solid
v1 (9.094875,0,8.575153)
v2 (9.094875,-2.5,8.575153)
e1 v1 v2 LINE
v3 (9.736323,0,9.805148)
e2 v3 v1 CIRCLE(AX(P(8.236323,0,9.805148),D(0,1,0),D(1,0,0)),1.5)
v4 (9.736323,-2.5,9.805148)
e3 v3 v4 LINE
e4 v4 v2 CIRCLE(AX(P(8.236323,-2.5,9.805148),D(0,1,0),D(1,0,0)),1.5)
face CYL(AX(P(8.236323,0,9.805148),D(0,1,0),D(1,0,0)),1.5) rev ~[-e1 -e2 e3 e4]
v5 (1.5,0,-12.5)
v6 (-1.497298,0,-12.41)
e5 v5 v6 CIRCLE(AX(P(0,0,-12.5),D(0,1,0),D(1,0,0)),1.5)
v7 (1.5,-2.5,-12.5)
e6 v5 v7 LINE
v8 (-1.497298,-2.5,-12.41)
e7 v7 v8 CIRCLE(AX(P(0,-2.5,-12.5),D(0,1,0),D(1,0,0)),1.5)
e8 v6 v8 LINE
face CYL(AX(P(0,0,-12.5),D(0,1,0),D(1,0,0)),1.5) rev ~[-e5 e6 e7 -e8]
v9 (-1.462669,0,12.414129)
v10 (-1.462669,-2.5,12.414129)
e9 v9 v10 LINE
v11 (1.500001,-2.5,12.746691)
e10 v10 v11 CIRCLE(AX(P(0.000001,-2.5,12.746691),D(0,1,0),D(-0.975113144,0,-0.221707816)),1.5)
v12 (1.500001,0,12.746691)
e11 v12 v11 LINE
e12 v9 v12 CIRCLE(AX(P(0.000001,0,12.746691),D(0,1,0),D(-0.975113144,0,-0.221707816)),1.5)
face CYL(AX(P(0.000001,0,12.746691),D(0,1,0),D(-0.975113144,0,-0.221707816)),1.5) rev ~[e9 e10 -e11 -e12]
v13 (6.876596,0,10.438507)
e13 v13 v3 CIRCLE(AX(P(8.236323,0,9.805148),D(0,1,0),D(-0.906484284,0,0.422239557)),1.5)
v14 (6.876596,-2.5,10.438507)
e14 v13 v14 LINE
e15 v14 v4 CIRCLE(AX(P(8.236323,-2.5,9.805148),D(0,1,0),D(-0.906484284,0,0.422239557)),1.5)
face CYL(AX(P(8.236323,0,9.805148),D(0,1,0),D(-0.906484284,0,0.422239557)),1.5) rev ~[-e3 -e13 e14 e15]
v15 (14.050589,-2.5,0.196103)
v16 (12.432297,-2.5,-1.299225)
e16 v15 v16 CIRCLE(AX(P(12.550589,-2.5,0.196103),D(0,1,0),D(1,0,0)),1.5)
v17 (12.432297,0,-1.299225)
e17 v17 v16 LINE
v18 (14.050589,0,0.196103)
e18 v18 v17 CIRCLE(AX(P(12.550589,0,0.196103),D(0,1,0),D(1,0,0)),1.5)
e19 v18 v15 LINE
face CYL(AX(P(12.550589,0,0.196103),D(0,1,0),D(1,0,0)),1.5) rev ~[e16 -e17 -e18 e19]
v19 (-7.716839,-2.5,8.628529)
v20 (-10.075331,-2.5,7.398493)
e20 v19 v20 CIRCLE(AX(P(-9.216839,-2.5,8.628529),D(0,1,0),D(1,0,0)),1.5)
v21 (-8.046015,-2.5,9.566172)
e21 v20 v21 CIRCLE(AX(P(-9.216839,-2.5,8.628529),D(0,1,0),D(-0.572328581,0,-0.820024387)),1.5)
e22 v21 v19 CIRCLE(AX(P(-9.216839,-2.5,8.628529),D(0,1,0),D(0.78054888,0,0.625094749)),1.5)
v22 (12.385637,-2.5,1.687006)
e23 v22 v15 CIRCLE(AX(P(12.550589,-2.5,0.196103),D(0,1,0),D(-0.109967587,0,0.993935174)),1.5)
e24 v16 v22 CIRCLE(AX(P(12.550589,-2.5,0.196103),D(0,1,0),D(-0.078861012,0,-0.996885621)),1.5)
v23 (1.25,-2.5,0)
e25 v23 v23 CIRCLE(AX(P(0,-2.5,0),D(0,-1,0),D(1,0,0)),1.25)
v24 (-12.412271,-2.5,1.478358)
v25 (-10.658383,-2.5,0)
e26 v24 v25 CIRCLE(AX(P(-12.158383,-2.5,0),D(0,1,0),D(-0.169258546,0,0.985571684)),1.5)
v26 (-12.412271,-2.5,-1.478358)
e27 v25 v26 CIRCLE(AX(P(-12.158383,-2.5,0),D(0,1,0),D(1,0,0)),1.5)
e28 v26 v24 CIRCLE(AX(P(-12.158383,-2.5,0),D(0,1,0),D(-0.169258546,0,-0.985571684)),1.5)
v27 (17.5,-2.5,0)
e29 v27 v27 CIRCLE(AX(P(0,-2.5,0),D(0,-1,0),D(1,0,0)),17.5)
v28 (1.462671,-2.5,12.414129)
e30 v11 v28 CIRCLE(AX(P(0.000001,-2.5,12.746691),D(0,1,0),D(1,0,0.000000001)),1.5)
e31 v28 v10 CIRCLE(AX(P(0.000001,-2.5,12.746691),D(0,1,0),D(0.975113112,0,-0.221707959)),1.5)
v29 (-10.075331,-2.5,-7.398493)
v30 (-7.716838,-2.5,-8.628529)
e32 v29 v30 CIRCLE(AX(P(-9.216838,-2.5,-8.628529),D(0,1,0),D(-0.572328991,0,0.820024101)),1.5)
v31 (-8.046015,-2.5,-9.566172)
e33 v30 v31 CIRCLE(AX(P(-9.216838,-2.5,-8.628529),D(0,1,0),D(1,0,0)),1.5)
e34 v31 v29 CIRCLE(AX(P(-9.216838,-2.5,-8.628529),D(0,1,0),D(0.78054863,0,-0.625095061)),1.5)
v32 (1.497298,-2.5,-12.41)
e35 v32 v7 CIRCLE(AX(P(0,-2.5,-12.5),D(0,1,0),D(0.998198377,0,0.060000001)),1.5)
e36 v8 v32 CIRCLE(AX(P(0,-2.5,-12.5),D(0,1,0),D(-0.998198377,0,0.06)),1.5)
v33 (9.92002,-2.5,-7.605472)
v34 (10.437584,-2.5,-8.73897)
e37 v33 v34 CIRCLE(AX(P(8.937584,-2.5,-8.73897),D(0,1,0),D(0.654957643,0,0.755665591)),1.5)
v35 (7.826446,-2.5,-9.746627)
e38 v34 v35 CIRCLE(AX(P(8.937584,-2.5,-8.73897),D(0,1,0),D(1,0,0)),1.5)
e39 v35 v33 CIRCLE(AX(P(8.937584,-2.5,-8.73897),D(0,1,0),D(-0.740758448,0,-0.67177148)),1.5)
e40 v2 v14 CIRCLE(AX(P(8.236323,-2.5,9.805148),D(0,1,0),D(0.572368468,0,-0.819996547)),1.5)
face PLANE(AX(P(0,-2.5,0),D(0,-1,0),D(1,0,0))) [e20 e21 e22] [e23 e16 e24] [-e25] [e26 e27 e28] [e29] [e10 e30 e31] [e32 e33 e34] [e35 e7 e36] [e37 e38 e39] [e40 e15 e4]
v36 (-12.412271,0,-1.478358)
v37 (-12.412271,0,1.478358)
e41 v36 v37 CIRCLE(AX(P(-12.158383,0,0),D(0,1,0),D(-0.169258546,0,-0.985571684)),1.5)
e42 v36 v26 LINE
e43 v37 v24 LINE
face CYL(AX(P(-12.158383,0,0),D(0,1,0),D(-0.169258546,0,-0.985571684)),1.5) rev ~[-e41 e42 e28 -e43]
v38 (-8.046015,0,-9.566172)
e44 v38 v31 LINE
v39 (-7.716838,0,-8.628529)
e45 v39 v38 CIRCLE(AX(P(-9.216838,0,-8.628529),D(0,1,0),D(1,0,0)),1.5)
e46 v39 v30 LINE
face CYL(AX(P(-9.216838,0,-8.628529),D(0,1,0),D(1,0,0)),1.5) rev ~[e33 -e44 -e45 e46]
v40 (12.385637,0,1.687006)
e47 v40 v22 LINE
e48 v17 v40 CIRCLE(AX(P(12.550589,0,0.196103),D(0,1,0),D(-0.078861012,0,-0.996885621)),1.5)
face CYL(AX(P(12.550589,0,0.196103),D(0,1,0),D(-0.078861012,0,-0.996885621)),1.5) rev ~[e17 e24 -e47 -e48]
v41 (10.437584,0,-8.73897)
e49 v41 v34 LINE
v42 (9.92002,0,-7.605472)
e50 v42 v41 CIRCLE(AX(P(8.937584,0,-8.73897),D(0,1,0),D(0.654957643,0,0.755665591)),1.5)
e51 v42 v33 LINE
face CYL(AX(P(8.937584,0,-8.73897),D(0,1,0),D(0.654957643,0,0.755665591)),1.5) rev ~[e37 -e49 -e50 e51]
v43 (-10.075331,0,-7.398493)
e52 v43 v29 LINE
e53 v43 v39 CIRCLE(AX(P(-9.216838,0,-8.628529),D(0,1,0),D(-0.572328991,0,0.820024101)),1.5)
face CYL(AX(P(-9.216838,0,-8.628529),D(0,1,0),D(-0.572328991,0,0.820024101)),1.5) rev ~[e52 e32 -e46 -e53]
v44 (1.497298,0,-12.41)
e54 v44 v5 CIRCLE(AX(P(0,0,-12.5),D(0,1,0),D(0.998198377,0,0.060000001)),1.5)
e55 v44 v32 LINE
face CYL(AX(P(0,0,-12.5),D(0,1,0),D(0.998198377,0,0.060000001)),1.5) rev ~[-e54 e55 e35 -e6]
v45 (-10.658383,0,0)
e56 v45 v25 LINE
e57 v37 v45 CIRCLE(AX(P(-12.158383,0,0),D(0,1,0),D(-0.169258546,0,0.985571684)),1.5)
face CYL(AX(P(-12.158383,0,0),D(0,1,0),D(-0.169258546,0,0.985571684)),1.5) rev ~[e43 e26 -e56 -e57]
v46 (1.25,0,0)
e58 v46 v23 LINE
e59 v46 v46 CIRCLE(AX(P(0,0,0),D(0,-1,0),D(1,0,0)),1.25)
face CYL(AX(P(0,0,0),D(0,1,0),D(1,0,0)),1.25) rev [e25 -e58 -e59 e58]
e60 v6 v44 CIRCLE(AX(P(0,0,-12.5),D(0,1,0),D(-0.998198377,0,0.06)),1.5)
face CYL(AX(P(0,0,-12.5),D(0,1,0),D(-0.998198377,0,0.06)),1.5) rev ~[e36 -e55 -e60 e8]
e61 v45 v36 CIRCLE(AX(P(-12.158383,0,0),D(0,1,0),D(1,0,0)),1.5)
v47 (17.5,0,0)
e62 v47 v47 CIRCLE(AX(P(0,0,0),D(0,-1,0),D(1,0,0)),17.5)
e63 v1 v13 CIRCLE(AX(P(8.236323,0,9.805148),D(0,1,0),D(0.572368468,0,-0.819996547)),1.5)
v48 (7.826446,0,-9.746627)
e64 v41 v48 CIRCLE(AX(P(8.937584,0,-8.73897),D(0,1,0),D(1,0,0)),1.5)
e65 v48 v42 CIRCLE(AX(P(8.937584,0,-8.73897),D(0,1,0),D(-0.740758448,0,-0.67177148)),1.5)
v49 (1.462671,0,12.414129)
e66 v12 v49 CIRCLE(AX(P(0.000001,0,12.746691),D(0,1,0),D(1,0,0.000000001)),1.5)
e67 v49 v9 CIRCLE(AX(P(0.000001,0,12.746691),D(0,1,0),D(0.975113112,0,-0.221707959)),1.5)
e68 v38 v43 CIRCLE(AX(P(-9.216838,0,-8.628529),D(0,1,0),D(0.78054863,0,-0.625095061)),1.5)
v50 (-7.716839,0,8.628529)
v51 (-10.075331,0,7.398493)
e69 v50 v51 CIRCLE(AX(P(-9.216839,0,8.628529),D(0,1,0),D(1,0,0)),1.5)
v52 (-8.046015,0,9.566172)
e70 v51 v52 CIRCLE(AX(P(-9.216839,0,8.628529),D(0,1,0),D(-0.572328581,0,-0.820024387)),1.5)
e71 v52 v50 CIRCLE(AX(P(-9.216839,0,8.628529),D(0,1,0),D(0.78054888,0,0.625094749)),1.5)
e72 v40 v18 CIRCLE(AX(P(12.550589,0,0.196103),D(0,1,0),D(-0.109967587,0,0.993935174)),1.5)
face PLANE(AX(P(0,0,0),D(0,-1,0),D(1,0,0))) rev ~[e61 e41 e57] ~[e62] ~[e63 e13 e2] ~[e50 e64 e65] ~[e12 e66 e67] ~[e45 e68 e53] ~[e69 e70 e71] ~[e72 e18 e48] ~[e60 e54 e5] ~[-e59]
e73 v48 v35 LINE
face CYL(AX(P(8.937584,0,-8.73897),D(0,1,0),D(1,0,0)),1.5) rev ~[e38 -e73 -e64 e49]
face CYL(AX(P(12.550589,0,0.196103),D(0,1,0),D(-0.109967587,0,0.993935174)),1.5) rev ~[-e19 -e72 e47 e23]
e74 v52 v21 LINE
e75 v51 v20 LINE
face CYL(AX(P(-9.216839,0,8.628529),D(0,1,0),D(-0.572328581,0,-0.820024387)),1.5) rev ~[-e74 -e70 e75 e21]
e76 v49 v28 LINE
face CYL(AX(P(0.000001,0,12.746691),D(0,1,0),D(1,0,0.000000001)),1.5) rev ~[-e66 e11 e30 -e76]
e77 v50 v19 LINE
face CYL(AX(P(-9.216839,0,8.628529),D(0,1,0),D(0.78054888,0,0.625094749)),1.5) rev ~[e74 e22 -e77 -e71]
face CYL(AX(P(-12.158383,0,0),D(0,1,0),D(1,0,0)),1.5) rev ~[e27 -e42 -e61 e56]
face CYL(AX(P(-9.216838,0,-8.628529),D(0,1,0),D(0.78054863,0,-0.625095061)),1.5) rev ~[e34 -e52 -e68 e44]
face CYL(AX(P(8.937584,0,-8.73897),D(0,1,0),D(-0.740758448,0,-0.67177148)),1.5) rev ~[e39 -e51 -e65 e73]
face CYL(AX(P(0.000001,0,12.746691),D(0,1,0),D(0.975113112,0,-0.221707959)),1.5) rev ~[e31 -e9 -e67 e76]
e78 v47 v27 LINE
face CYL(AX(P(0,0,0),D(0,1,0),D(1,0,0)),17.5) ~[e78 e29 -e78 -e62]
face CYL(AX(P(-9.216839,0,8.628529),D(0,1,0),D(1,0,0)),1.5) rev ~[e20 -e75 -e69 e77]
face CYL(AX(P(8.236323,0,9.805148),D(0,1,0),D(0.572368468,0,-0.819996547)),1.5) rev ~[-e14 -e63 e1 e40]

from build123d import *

# Parameters (mm, degrees)
F0_R     = 17.5
F0_R_2   = 2.5
F0_R_3   = 1.25
F1_DEPTH = 2.5


# Not quite as in the source:
# - the program builds the solid bodies; features that only make, move or delete a surface that nothing else refers to are left out


with BuildPart() as f1:
    # F0 (on Front) → F1 (new body)
    with BuildSketch(Plane.XZ):
        Circle(F0_R)
        with BuildLine():
            ThreePointArc((1.4972975656, -12.41), (1.4993242392, -12.454979718), (1.5, -12.5))
            ThreePointArc((1.5, -12.5), (-0.045020282, -13.9993242392), (-1.4972975656, -12.41))
            ThreePointArc((-1.4972975656, -12.41), (-4.9790100681, -11.4655771221), (-8.0460146394, -9.5661720883))
            ThreePointArc((-8.0460146394, -9.5661720883), (-10.3118696418, -9.6536659725), (-10.0753310722, -7.3984933456))
            ThreePointArc((-10.0753310722, -7.3984933456), (-11.6269109472, -4.5896559594), (-12.4122705024, -1.4783575263))
            ThreePointArc((-12.4122705024, -1.4783575263), (-13.658382684, 0), (-12.4122705024, 1.4783575263))
            ThreePointArc((-12.4122705024, 1.4783575263), (-11.6269110451, 4.5896557115), (-10.0753313878, 7.3984929159))
            ThreePointArc((-10.0753313878, 7.3984929159), (-10.3118706248, 9.6536659173), (-8.0460151958, 9.5661716203))
            ThreePointArc((-8.0460151958, 9.5661716203), (-4.9630114991, 11.472511358), (-1.4626687852, 12.4141290482))
            ThreePointArc((-1.4626687852, 12.4141290482), (-0.167324239, 14.2373289873), (1.5000009313, 12.7466907725))
            ThreePointArc((1.5000009313, 12.7466907725), (1.4906391339, 12.5793654932), (1.4626705992, 12.4141288344))
            ThreePointArc((1.4626705992, 12.4141288344), (4.2850452641, 11.7425886024), (6.8765961266, 10.4385068718))
            ThreePointArc((6.8765961266, 10.4385068718), (8.5606760335, 11.2696593384), (9.736322552, 9.8051475361))
            ThreePointArc((9.736322552, 9.8051475361), (9.5663280132, 9.1115442827), (9.0948752545, 8.5751527162))
            ThreePointArc((9.0948752545, 8.5751527162), (11.2789515194, 5.388436937), (12.3856373166, 1.6870057091))
            ThreePointArc((12.3856373166, 1.6870057091), (13.5512317227, 1.3135614646), (14.0505886972, 0.1961029484))
            ThreePointArc((14.0505886972, 0.1961029484), (13.5685677546, -0.9055860452), (12.4322971789, -1.2992254827))
            ThreePointArc((12.4322971789, -1.2992254827), (11.6124376907, -4.6261529244), (9.9200203194, -7.6054715083))
            ThreePointArc((9.9200203194, -7.6054715083), (10.3020717987, -8.1159348628), (10.4375838551, -8.7389698954))
            ThreePointArc((10.4375838551, -8.7389698954), (9.4776271369, -10.1383816482), (7.8264461833, -9.7466271161))
            ThreePointArc((7.8264461833, -9.7466271161), (4.8483438568, -11.5214392263), (1.4972975656, -12.41))
        make_face(mode=Mode.SUBTRACT)
        with BuildLine():
            ThreePointArc((-1.4972975656, -12.41), (0, -11), (1.4972975656, -12.41))
            ThreePointArc((1.4972975656, -12.41), (4.8483438568, -11.5214392263), (7.8264461833, -9.7466271161))
            ThreePointArc((7.8264461833, -9.7466271161), (7.8650737925, -7.690293508), (9.9200203194, -7.6054715083))
            ThreePointArc((9.9200203194, -7.6054715083), (11.6124376907, -4.6261529244), (12.4322971789, -1.2992254827))
            ThreePointArc((12.4322971789, -1.2992254827), (11.0507717691, 0.1726683089), (12.3856373166, 1.6870057091))
            ThreePointArc((12.3856373166, 1.6870057091), (11.2789515194, 5.388436937), (9.0948752545, 8.5751527162))
            ThreePointArc((9.0948752545, 8.5751527162), (7.271534517, 8.6565901594), (6.8765961266, 10.4385068718))
            ThreePointArc((6.8765961266, 10.4385068718), (4.2850452641, 11.7425886024), (1.4626705992, 12.4141288344))
            ThreePointArc((1.4626705992, 12.4141288344), (8.217e-07, 11.2466907725), (-1.4626687852, 12.4141290482))
            ThreePointArc((-1.4626687852, 12.4141290482), (-4.9630114991, 11.472511358), (-8.0460151958, 9.5661716203))
            ThreePointArc((-8.0460151958, 9.5661716203), (-7.8015231838, 9.1254022263), (-7.7168385163, 8.6285294965))
            ThreePointArc((-7.7168385163, 8.6285294965), (-8.5232029157, 7.298540905), (-10.0753313878, 7.3984929159))
            ThreePointArc((-10.0753313878, 7.3984929159), (-11.6269110451, 4.5896557115), (-12.4122705024, 1.4783575263))
            ThreePointArc((-12.4122705024, 1.4783575263), (-11.1916437657, 1.146915805), (-10.658382684, 0))
            ThreePointArc((-10.658382684, 0), (-11.1916437657, -1.146915805), (-12.4122705024, -1.4783575263))
            ThreePointArc((-12.4122705024, -1.4783575263), (-11.6269109472, -4.5896559594), (-10.0753310722, -7.3984933456))
            ThreePointArc((-10.0753310722, -7.3984933456), (-8.5232023173, -7.2985407313), (-7.716837585, -8.6285294965))
            ThreePointArc((-7.716837585, -8.6285294965), (-7.8015223518, -9.1254025092), (-8.0460146394, -9.5661720883))
            ThreePointArc((-8.0460146394, -9.5661720883), (-4.9790100681, -11.4655771221), (-1.4972975656, -12.41))
        make_face()
        Circle(F0_R_2, mode=Mode.SUBTRACT)
        Circle(F0_R_2)
        Circle(F0_R_3, mode=Mode.SUBTRACT)
    extrude(amount=F1_DEPTH)


solid = f1.part
